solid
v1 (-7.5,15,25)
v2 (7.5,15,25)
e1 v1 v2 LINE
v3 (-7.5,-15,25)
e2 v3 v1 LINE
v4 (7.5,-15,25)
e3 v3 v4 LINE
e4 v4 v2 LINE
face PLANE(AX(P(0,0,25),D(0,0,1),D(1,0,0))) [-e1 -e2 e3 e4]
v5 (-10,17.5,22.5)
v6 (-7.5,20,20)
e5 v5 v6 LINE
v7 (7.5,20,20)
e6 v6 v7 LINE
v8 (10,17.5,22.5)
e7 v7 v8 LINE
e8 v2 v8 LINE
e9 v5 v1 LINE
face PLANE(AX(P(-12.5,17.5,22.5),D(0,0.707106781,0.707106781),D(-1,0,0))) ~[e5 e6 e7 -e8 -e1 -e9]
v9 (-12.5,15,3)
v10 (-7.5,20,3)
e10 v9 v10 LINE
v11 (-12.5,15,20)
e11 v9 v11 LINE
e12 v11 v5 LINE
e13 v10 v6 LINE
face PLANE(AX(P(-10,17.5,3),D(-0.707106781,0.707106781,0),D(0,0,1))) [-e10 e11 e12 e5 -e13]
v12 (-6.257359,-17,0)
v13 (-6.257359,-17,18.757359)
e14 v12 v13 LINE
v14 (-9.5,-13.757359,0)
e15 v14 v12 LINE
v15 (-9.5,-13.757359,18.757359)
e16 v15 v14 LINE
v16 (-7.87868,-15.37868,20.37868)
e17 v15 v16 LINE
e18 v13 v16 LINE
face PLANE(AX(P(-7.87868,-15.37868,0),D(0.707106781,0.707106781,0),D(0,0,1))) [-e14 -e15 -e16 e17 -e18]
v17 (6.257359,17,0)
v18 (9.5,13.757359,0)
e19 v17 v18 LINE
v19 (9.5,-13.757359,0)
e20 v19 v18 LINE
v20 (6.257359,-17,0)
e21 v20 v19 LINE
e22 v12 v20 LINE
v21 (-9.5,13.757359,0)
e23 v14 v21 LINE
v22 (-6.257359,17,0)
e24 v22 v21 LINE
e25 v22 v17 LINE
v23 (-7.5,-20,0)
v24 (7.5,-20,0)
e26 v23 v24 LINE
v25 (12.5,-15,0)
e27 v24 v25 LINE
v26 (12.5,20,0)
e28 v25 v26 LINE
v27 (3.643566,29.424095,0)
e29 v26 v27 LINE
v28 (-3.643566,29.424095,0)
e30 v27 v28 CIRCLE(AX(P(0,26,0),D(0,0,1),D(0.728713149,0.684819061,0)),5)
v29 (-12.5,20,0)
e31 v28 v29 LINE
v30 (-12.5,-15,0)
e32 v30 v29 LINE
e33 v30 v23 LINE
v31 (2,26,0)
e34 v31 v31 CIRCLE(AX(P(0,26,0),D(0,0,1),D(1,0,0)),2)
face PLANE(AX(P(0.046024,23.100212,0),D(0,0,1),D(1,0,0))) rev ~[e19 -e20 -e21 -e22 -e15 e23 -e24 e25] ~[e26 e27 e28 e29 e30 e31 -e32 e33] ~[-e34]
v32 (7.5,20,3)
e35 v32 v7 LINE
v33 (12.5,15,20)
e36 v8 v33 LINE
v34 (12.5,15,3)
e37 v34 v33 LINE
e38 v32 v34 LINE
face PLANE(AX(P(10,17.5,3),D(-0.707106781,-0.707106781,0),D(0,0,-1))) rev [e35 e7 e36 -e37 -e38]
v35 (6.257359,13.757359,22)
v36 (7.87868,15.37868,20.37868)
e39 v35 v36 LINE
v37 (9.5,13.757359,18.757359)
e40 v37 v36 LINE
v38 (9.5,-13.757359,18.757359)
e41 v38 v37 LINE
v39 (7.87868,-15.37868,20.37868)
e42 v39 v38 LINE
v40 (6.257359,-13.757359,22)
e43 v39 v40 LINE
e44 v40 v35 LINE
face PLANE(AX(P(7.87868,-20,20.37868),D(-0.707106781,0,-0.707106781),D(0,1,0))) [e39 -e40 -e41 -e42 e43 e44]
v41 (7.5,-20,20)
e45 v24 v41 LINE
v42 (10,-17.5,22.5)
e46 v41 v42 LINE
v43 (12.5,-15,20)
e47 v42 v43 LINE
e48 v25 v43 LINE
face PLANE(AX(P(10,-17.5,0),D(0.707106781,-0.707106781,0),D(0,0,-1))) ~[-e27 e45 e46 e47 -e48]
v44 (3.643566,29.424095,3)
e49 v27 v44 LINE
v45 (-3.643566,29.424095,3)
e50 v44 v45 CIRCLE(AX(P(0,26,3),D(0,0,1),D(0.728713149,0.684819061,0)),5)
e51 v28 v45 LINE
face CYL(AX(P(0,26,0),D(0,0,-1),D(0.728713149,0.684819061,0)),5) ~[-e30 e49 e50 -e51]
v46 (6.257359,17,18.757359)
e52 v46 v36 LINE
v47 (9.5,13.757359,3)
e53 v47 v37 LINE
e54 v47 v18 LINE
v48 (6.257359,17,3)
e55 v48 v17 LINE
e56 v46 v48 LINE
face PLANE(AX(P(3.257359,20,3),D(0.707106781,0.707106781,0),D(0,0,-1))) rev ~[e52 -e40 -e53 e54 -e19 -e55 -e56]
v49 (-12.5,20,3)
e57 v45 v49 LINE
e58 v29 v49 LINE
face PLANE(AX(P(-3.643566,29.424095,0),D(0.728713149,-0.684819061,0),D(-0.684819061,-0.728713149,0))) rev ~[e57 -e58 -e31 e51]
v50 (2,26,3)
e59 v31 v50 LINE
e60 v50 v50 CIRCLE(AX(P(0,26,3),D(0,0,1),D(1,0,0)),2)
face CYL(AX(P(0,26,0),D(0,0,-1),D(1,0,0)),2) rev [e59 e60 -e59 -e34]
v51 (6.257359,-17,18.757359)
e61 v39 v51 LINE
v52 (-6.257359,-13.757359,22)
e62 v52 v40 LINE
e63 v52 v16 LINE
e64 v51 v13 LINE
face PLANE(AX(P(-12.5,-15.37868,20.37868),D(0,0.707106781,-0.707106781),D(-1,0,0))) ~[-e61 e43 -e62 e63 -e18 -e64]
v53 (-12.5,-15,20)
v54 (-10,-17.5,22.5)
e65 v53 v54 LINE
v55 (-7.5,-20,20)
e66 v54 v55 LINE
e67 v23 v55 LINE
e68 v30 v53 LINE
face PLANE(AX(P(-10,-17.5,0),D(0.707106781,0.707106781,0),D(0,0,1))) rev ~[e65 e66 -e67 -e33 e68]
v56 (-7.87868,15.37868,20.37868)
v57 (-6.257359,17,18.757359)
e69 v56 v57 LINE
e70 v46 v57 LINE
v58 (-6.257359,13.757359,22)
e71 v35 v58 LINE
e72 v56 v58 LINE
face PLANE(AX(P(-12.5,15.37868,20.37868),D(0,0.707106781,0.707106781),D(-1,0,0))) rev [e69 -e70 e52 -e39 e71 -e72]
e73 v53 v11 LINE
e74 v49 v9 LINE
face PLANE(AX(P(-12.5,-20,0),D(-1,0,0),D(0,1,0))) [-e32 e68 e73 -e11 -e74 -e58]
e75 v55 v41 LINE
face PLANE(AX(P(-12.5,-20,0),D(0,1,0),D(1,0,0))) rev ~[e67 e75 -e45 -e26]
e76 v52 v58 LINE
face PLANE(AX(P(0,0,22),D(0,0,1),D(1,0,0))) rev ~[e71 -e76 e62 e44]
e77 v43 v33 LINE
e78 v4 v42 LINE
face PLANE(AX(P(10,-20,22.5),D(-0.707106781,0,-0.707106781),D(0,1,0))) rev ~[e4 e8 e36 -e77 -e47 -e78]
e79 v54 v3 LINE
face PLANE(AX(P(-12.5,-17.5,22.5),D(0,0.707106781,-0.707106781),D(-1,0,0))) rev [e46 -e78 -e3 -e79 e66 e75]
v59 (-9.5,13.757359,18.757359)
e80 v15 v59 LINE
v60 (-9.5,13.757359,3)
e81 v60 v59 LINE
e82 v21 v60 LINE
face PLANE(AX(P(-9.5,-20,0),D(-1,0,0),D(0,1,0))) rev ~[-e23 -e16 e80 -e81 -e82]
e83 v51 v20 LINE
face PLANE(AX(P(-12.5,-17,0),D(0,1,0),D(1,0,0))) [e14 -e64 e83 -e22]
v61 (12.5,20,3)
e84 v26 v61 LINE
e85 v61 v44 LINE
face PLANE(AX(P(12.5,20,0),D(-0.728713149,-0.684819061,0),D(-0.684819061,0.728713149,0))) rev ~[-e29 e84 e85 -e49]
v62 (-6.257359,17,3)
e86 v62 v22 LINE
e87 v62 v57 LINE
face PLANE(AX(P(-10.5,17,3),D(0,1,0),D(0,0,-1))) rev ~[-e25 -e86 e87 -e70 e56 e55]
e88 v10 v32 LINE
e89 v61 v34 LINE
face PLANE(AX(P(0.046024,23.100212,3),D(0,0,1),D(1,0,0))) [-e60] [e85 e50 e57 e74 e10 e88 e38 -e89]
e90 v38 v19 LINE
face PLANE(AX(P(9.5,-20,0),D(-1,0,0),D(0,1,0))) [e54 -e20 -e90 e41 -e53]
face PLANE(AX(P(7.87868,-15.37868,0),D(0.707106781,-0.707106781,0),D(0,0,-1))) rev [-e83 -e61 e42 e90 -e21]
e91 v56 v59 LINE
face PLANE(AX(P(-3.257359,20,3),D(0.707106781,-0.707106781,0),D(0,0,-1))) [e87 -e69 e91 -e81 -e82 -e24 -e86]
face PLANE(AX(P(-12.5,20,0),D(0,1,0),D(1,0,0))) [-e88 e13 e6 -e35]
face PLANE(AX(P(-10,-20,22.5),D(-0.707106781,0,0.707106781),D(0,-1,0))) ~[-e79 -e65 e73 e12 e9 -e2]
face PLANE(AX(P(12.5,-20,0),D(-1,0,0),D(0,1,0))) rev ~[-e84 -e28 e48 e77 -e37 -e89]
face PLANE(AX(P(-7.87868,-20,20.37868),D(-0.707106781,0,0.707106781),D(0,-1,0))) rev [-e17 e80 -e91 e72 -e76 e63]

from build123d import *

# Parameters (mm, degrees)
F0_W        = 25
F0_H        = 40
F1_DEPTH    = 25
F0_R        = 2
F2_DEPTH    = 3
F3_SIZE     = 5
F4_SIZE     = 5
F5_T        = 3
F5_T3_DEPTH = 21
F5_T5_DEPTH = 13.0710678119
F5_T7_DEPTH = 13.0710678119


# Not quite as in the source:
# - a shell that OpenCascade refuses in one call is made with other operations: the cavity is built on its own and cut out


with BuildPart() as f1:
    # F0 (on Top) → F1 (new body)
    with BuildSketch(Plane.XY):
        Rectangle(F0_W, F0_H)
    extrude(amount=F1_DEPTH)

    # F0 (on Top) → F2 (join)
    with BuildSketch(Plane.XY):
        with BuildLine():
            Line((-3.6435657461, 29.4240953044), (-12.5, 20))
            Line((-12.5, 20), (12.5, 20))
            Line((12.5, 20), (3.6435657461, 29.4240953044))
            ThreePointArc((3.6435657461, 29.4240953044), (4.6485389495, 27.8414900583), (5, 26))
            ThreePointArc((5, 26), (-1.8414900583, 21.3514610505), (-3.6435657461, 29.4240953044))
        make_face()
        with BuildLine():
            ThreePointArc((3.6435657461, 29.4240953044), (0, 31), (-3.6435657461, 29.4240953044))
            ThreePointArc((-3.6435657461, 29.4240953044), (-1.8414900583, 21.3514610505), (5, 26))
            ThreePointArc((5, 26), (4.6485389495, 27.8414900583), (3.6435657461, 29.4240953044))
        make_face()
        with Locations((0, 26)):
            Circle(F0_R, mode=Mode.SUBTRACT)
    extrude(amount=F2_DEPTH)

    # F3
    f3_edges = [f1.edges().sort_by_distance(p)[0] for p in [
        (12.5, 0, 25),
        (0, -20, 25),
        (-12.5, 0, 25),
        (0, 20, 25),
    ]]
    chamfer(f3_edges, length=F3_SIZE)

    # F4
    f4_edges = [f1.edges().sort_by_distance(p)[0] for p in [
        (-12.5, -20, 10),
        (12.5, -20, 10),
        (12.5, 20, 11.5),
        (-12.5, 20, 11.5),
    ]]
    chamfer(f4_edges, length=F4_SIZE)

    # F5: shell of thickness 3, made by hand


with BuildPart() as f5_core1:
    # F5_t2: copy of F1
    add(f1.part)

    # the walls: a layer under each face that stays
    f5_faces = [f5_core1.faces().sort_by_distance(p)[0] for p in [
        (0, 20, 11.5),
        (0, 17.5, 22.5),
        (10, 17.5, 12.75),
        (-10, 17.5, 12.75),
        (0, 23, 3),
        (10, 0, 22.5),
        (0, 0, 25),
        (-10, 0, 22.5),
        (12.5, 2.5, 10),
        (-12.5, 2.5, 10),
        (-8.0717828731, 24.7120476522, 1.5),
        (8.0717828731, 24.7120476522, 1.5),
        (0, 31, 1.5),
        (-2, 26, 1.5),
        (0, -17.5, 22.5),
        (10, -17.5, 11.25),
        (-10, -17.5, 11.25),
        (0, -20, 10),
    ]]
    thicken(f5_faces, amount=-F5_T, mode=Mode.SUBTRACT)

    # F5_s4 → F5_t3 (cut)
    with BuildSketch(Plane.YZ.offset(-10.5)):
        Polygon((20.03, 3.03), (17, 3), (17, 0), (20, 0), align=None)
    extrude(amount=F5_T3_DEPTH, mode=Mode.SUBTRACT)

    # F5_s6 → F5_t5 (cut)
    with BuildSketch(Plane(origin=(-8.3713203436, 8.3713203436, 0), x_dir=(0, 0, 1), z_dir=(0.7071067812, -0.7071067812, 0))):
        Polygon((3.03, -19.4754364826), (3, -16.4454364826), (0, -16.4454364826), (0, -19.4454364826), align=None)
    extrude(amount=F5_T5_DEPTH, mode=Mode.SUBTRACT)

    # F5_s8 → F5_t7 (cut)
    with BuildSketch(Plane(origin=(8.3713203436, 8.3713203436, 0), x_dir=(0, 0, 1), z_dir=(-0.7071067812, -0.7071067812, 0))):
        Polygon((3.03, 19.4754364826), (3, 16.4454364826), (0, 16.4454364826), (0, 19.4454364826), align=None)
    extrude(amount=F5_T7_DEPTH, mode=Mode.SUBTRACT)


with BuildPart() as f1_1:
    add(f1.part)

    # what is left inside the walls is the cavity
    f5_cavity = [f5_core1.part.solids().sort_by_distance(p)[0] for p in [
        (0, -5.666667, 0.03),
    ]]
    add(f5_cavity, mode=Mode.SUBTRACT)


solid = f1_1.part
